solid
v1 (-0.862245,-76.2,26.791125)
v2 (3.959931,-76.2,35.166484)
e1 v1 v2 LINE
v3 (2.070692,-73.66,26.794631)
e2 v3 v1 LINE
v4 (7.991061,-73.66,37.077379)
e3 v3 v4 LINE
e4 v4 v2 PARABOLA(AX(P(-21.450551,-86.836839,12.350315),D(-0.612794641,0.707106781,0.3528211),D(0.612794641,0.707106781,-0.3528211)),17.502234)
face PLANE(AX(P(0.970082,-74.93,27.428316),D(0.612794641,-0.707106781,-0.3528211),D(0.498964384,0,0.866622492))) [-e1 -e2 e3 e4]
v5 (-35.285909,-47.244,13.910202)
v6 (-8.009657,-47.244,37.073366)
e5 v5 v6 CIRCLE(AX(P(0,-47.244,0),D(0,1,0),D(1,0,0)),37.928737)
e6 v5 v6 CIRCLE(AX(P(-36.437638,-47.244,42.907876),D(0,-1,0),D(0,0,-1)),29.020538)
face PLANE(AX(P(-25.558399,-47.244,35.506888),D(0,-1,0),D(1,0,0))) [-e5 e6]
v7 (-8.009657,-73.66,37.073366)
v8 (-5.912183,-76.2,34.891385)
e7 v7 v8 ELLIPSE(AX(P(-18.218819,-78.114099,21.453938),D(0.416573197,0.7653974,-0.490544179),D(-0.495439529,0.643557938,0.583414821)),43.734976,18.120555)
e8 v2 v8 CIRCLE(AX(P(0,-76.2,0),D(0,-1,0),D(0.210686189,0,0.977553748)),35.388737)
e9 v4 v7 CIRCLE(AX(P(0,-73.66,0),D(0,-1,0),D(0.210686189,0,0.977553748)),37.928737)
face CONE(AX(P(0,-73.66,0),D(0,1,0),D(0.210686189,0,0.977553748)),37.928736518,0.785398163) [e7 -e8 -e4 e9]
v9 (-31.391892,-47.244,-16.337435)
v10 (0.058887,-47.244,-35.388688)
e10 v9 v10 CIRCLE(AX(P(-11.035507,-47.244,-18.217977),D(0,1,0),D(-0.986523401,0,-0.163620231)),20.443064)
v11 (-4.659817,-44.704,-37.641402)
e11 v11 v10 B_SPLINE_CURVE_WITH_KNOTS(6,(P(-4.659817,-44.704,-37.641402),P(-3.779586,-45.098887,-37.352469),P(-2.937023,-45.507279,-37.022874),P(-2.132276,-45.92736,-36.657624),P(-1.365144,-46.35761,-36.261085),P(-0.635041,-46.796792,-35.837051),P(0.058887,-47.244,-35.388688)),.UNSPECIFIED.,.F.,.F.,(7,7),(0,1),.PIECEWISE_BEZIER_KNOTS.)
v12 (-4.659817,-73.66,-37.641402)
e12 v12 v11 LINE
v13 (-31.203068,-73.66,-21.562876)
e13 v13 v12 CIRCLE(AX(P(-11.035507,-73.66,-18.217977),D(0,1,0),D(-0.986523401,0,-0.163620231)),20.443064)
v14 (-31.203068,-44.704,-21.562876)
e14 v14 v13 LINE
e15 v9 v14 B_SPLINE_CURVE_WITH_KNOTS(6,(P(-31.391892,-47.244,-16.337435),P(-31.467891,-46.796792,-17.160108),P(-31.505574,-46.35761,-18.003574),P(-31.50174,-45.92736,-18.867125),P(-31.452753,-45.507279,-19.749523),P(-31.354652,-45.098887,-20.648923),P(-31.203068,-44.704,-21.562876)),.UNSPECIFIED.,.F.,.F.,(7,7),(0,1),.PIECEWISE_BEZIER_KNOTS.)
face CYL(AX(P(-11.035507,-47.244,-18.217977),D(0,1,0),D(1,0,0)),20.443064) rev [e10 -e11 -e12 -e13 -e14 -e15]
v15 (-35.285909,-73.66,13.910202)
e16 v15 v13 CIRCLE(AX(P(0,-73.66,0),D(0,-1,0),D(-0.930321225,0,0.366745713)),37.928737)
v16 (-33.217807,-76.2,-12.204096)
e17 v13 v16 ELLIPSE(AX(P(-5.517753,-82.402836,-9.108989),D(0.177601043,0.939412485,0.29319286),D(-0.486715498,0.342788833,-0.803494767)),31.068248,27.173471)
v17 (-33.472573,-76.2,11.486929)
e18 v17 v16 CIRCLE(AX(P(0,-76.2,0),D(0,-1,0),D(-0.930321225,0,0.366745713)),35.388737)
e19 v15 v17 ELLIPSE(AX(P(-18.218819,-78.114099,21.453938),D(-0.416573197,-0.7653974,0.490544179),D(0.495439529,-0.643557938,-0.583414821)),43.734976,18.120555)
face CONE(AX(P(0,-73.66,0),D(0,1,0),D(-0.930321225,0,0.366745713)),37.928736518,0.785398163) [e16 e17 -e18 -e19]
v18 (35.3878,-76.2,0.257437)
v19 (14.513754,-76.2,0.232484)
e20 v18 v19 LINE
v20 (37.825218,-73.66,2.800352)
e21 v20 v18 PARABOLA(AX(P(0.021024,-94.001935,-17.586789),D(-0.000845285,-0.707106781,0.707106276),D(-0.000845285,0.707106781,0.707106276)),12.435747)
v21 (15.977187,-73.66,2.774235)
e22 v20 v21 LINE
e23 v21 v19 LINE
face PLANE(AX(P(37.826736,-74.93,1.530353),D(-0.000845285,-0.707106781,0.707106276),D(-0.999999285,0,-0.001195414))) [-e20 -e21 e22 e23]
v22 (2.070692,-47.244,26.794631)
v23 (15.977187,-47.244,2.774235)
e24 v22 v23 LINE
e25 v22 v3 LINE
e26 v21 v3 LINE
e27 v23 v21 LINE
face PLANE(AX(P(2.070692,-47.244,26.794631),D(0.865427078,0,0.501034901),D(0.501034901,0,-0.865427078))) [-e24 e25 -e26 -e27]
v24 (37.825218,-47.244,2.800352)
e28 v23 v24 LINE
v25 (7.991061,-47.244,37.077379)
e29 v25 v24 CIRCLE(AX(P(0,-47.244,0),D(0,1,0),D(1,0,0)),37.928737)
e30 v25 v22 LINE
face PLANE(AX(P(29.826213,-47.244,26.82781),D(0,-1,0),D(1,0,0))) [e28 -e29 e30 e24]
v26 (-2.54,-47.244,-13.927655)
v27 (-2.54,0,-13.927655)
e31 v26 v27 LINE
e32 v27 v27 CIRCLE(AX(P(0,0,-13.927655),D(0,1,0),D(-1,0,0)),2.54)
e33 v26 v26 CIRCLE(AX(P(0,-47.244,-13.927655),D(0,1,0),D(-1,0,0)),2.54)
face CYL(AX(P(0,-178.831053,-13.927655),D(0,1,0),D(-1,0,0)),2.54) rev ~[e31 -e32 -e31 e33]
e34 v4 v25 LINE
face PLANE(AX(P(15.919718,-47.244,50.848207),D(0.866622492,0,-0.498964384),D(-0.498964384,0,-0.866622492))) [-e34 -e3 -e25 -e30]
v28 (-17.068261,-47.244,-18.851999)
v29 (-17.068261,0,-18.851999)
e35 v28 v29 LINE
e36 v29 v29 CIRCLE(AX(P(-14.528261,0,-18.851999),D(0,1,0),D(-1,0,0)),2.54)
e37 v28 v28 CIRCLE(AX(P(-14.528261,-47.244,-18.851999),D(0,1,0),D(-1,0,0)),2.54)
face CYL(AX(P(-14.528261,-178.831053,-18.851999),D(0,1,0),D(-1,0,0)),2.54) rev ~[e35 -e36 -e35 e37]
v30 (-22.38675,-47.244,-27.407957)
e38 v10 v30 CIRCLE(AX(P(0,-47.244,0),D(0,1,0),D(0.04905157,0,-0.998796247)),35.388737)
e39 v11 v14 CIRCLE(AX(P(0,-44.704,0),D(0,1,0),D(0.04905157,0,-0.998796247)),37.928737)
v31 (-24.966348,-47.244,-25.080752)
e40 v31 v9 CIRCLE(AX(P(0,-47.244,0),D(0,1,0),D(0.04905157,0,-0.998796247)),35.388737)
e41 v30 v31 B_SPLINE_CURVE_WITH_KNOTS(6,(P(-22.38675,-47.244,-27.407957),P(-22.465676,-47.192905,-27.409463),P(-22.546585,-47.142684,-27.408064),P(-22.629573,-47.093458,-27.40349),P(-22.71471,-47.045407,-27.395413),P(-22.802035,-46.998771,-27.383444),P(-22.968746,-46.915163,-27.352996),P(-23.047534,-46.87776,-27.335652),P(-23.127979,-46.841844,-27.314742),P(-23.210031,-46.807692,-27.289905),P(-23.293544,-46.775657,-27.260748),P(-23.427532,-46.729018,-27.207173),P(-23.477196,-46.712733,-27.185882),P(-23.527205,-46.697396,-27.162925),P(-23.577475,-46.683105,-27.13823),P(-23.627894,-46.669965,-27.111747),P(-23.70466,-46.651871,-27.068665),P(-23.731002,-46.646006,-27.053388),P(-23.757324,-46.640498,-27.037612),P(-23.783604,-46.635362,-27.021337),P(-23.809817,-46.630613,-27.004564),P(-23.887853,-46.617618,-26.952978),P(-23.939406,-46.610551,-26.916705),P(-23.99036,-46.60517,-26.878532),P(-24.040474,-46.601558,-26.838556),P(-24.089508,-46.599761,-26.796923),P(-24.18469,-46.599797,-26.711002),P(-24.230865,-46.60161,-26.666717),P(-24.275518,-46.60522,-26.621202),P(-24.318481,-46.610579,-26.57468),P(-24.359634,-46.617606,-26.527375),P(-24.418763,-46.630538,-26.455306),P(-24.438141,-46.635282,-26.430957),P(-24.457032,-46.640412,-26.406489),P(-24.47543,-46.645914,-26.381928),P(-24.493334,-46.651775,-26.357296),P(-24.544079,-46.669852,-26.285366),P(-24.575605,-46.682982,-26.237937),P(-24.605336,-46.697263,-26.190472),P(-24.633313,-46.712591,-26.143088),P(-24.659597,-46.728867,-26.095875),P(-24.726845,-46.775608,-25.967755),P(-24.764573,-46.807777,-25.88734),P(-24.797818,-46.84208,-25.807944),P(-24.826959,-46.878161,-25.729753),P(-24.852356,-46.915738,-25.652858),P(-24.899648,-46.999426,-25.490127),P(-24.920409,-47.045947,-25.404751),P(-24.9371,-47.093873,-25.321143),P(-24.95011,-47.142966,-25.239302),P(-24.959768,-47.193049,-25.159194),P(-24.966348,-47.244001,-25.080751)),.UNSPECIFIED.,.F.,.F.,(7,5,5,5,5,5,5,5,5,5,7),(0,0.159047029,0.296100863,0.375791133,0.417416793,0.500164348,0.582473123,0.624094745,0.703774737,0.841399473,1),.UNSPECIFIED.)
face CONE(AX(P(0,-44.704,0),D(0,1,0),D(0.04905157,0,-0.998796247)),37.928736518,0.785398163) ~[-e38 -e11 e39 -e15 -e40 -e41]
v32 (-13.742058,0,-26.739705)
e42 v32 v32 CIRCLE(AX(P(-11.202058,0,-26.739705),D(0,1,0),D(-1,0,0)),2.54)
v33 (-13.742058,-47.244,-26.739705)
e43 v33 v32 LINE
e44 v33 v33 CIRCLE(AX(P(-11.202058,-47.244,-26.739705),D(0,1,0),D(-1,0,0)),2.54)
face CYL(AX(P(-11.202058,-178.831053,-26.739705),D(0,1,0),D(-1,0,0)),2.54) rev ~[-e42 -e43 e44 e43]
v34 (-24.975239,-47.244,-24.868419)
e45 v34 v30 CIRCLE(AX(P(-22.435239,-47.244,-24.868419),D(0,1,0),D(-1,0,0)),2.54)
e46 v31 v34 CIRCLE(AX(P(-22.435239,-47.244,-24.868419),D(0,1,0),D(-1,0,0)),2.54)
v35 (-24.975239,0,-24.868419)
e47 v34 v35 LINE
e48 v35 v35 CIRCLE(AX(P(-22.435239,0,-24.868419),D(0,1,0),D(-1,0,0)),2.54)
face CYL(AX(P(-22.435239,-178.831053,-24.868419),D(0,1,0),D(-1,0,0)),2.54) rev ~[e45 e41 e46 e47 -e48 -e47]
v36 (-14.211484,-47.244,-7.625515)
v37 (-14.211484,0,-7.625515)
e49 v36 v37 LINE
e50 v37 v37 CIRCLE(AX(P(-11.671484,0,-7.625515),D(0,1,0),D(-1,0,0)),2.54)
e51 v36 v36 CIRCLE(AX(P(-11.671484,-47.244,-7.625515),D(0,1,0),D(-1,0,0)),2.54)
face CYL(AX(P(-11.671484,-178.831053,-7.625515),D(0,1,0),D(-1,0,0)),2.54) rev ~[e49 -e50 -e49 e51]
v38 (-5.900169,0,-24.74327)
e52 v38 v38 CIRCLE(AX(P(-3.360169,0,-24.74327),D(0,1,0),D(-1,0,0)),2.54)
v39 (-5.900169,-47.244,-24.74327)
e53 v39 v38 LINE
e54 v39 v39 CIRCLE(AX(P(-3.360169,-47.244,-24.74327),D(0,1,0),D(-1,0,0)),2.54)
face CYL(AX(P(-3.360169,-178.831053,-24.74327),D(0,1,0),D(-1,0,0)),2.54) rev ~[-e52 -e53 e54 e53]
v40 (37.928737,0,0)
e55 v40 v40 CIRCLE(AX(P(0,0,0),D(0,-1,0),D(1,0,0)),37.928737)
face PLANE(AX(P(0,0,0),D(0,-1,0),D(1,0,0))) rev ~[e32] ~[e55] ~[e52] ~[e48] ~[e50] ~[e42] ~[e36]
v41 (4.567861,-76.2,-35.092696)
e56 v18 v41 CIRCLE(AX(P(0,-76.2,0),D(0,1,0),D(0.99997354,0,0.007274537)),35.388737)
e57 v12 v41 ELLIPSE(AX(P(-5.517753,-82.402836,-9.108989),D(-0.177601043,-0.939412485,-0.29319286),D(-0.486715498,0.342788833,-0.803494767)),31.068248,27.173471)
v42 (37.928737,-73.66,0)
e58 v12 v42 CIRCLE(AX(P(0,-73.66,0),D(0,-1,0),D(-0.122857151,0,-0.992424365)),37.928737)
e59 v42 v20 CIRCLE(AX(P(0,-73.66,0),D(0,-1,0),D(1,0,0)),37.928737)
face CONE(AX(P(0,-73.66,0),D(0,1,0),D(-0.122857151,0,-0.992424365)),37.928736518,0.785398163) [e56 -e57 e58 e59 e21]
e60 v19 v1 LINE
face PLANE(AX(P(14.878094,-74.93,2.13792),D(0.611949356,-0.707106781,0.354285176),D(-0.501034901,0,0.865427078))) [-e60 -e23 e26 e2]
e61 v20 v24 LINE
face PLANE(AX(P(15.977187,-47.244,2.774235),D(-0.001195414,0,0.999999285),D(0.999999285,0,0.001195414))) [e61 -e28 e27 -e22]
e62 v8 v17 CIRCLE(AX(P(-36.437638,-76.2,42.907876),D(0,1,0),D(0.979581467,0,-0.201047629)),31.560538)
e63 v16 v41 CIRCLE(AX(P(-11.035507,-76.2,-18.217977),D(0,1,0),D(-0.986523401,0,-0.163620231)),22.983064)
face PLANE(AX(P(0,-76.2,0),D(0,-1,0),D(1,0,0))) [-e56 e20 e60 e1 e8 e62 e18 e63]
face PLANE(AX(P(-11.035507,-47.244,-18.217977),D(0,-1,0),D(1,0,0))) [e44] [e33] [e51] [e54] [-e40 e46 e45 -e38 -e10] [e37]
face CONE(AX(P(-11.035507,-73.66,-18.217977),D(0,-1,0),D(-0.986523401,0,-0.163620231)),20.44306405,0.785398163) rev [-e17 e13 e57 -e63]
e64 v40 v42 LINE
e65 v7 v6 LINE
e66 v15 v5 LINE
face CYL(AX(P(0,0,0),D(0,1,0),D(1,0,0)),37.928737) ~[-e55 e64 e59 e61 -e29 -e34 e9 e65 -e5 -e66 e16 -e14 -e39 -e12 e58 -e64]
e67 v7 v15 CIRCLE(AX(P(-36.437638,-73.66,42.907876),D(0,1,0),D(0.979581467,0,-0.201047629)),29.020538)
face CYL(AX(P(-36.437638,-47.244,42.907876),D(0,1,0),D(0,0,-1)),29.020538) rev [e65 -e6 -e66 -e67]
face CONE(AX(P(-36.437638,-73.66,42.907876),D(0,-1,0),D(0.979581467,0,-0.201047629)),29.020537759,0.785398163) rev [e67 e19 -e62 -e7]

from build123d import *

# Parameters (mm, degrees)
F0_R        = 37.9287365184
F1_DEPTH    = 76.2
F3_R        = 20.4430640503
F4_DEPTH    = 43.688
F5_SIZE     = 2.54
F7_D        = 5.08
F8_T4_ANGLE = 68.0337710329
F8_S5_R     = 20.4430640503
F8_T6_DEPTH = 23


# Not quite as in the source:
# - a fillet or chamfer that OpenCascade refuses, or shapes differently, is made with other operations: its cross-section is extruded or revolved along the edge and cut away or added


with BuildPart() as f1:
    # F0 (on Front) → F1 (new body)
    with BuildSketch(Plane.XZ):
        Circle(F0_R)
    extrude(amount=F1_DEPTH)

    # F3 (on offset) → F4 (cut)
    with BuildSketch(Plane.XZ.offset(47.244)):
        with BuildLine():
            Line((-7.417100016, 52.0775169134), (-39.2948538065, 52.0775169134))
            Line((-39.2948538065, 52.0775169134), (-39.2948538065, 13.8873383403))
            Line((-39.2948538065, 13.8873383403), (-36.437637775, 13.8873383403))
            ThreePointArc((-36.437637775, 13.8873383403), (-15.9170187319, 22.3872570562), (-7.417100016, 42.9078760992))
            Line((-7.417100016, 42.9078760992), (-7.417100016, 52.0775169134))
        make_face()
        Polygon((43.7327071249, 2.8074141011), (57.5817332447, 26.8609896883), (43.6752387942, 50.8813859194), (15.9197182239, 50.8482065633), (2.070692104, 26.794630976), (15.9771865545, 2.7742347449), align=None)
        with Locations((-11.0355066136, -18.2179771364)):
            Circle(F3_R)
    extrude(amount=F4_DEPTH, mode=Mode.SUBTRACT)

    # F5
    f5_edges = [f1.edges().sort_by_distance(p)[0] for p in [
        (25.118202, -76.2, -28.419448),
        (37.902848, -76.2, 1.401132),
        (26.901202, -76.2, 2.787293),
        (9.023939, -76.2, 14.784433),
        (5.030877, -76.2, 31.936005),
        (-0.009512, -76.2, 37.928735),
        (-17.652727, -76.2, 20.787326),
        (-37.679979, -76.2, -4.336848),
        (-0.443827, -76.2, -0.732692),
    ]]
    chamfer(f5_edges, length=F5_SIZE)

    # F7 (through all)
    with Locations(Plane.XZ.offset(47.244)):
        with Locations((-11.6714835167, -7.6255151071), (0, -13.9276552945), (-14.5282614976, -18.8519991934), (-3.3601692412, -24.743270129), (-11.2020578235, -26.739705354), (-22.4352385849, -24.8684193939)):
            Hole(F7_D / 2)

    # F8: chamfer of 2.54 on 1 edges, made by hand


with BuildPart() as f8_tool2:
    # F8_s3 → F8_t4 (revolve)
    with BuildSketch(Plane(origin=(0, 0, 0), x_dir=(0, 1, 0), z_dir=(0.9987962472, 0, 0.0490515704))):
        Polygon((-44.704, -37.9287365184), (-47.244, -35.3887365184), (-47.244, -37.9287365184), align=None)
    revolve(axis=Axis((0, -47.244, 0), (0, 1, 0)), revolution_arc=F8_T4_ANGLE)

    # F8_s5 → F8_t6 (intersect, symmetric)
    with BuildSketch(Plane.XZ.offset(46)):
        with Locations((-11.0355066136, -18.2179771364)):
            Circle(F8_S5_R)
    extrude(amount=F8_T6_DEPTH, both=True, mode=Mode.INTERSECT)


with BuildPart() as f1_1:
    add(f1.part)

    # F8_t1: cut F8_tool2
    add(f8_tool2.part, mode=Mode.SUBTRACT)


solid = f1_1.part
